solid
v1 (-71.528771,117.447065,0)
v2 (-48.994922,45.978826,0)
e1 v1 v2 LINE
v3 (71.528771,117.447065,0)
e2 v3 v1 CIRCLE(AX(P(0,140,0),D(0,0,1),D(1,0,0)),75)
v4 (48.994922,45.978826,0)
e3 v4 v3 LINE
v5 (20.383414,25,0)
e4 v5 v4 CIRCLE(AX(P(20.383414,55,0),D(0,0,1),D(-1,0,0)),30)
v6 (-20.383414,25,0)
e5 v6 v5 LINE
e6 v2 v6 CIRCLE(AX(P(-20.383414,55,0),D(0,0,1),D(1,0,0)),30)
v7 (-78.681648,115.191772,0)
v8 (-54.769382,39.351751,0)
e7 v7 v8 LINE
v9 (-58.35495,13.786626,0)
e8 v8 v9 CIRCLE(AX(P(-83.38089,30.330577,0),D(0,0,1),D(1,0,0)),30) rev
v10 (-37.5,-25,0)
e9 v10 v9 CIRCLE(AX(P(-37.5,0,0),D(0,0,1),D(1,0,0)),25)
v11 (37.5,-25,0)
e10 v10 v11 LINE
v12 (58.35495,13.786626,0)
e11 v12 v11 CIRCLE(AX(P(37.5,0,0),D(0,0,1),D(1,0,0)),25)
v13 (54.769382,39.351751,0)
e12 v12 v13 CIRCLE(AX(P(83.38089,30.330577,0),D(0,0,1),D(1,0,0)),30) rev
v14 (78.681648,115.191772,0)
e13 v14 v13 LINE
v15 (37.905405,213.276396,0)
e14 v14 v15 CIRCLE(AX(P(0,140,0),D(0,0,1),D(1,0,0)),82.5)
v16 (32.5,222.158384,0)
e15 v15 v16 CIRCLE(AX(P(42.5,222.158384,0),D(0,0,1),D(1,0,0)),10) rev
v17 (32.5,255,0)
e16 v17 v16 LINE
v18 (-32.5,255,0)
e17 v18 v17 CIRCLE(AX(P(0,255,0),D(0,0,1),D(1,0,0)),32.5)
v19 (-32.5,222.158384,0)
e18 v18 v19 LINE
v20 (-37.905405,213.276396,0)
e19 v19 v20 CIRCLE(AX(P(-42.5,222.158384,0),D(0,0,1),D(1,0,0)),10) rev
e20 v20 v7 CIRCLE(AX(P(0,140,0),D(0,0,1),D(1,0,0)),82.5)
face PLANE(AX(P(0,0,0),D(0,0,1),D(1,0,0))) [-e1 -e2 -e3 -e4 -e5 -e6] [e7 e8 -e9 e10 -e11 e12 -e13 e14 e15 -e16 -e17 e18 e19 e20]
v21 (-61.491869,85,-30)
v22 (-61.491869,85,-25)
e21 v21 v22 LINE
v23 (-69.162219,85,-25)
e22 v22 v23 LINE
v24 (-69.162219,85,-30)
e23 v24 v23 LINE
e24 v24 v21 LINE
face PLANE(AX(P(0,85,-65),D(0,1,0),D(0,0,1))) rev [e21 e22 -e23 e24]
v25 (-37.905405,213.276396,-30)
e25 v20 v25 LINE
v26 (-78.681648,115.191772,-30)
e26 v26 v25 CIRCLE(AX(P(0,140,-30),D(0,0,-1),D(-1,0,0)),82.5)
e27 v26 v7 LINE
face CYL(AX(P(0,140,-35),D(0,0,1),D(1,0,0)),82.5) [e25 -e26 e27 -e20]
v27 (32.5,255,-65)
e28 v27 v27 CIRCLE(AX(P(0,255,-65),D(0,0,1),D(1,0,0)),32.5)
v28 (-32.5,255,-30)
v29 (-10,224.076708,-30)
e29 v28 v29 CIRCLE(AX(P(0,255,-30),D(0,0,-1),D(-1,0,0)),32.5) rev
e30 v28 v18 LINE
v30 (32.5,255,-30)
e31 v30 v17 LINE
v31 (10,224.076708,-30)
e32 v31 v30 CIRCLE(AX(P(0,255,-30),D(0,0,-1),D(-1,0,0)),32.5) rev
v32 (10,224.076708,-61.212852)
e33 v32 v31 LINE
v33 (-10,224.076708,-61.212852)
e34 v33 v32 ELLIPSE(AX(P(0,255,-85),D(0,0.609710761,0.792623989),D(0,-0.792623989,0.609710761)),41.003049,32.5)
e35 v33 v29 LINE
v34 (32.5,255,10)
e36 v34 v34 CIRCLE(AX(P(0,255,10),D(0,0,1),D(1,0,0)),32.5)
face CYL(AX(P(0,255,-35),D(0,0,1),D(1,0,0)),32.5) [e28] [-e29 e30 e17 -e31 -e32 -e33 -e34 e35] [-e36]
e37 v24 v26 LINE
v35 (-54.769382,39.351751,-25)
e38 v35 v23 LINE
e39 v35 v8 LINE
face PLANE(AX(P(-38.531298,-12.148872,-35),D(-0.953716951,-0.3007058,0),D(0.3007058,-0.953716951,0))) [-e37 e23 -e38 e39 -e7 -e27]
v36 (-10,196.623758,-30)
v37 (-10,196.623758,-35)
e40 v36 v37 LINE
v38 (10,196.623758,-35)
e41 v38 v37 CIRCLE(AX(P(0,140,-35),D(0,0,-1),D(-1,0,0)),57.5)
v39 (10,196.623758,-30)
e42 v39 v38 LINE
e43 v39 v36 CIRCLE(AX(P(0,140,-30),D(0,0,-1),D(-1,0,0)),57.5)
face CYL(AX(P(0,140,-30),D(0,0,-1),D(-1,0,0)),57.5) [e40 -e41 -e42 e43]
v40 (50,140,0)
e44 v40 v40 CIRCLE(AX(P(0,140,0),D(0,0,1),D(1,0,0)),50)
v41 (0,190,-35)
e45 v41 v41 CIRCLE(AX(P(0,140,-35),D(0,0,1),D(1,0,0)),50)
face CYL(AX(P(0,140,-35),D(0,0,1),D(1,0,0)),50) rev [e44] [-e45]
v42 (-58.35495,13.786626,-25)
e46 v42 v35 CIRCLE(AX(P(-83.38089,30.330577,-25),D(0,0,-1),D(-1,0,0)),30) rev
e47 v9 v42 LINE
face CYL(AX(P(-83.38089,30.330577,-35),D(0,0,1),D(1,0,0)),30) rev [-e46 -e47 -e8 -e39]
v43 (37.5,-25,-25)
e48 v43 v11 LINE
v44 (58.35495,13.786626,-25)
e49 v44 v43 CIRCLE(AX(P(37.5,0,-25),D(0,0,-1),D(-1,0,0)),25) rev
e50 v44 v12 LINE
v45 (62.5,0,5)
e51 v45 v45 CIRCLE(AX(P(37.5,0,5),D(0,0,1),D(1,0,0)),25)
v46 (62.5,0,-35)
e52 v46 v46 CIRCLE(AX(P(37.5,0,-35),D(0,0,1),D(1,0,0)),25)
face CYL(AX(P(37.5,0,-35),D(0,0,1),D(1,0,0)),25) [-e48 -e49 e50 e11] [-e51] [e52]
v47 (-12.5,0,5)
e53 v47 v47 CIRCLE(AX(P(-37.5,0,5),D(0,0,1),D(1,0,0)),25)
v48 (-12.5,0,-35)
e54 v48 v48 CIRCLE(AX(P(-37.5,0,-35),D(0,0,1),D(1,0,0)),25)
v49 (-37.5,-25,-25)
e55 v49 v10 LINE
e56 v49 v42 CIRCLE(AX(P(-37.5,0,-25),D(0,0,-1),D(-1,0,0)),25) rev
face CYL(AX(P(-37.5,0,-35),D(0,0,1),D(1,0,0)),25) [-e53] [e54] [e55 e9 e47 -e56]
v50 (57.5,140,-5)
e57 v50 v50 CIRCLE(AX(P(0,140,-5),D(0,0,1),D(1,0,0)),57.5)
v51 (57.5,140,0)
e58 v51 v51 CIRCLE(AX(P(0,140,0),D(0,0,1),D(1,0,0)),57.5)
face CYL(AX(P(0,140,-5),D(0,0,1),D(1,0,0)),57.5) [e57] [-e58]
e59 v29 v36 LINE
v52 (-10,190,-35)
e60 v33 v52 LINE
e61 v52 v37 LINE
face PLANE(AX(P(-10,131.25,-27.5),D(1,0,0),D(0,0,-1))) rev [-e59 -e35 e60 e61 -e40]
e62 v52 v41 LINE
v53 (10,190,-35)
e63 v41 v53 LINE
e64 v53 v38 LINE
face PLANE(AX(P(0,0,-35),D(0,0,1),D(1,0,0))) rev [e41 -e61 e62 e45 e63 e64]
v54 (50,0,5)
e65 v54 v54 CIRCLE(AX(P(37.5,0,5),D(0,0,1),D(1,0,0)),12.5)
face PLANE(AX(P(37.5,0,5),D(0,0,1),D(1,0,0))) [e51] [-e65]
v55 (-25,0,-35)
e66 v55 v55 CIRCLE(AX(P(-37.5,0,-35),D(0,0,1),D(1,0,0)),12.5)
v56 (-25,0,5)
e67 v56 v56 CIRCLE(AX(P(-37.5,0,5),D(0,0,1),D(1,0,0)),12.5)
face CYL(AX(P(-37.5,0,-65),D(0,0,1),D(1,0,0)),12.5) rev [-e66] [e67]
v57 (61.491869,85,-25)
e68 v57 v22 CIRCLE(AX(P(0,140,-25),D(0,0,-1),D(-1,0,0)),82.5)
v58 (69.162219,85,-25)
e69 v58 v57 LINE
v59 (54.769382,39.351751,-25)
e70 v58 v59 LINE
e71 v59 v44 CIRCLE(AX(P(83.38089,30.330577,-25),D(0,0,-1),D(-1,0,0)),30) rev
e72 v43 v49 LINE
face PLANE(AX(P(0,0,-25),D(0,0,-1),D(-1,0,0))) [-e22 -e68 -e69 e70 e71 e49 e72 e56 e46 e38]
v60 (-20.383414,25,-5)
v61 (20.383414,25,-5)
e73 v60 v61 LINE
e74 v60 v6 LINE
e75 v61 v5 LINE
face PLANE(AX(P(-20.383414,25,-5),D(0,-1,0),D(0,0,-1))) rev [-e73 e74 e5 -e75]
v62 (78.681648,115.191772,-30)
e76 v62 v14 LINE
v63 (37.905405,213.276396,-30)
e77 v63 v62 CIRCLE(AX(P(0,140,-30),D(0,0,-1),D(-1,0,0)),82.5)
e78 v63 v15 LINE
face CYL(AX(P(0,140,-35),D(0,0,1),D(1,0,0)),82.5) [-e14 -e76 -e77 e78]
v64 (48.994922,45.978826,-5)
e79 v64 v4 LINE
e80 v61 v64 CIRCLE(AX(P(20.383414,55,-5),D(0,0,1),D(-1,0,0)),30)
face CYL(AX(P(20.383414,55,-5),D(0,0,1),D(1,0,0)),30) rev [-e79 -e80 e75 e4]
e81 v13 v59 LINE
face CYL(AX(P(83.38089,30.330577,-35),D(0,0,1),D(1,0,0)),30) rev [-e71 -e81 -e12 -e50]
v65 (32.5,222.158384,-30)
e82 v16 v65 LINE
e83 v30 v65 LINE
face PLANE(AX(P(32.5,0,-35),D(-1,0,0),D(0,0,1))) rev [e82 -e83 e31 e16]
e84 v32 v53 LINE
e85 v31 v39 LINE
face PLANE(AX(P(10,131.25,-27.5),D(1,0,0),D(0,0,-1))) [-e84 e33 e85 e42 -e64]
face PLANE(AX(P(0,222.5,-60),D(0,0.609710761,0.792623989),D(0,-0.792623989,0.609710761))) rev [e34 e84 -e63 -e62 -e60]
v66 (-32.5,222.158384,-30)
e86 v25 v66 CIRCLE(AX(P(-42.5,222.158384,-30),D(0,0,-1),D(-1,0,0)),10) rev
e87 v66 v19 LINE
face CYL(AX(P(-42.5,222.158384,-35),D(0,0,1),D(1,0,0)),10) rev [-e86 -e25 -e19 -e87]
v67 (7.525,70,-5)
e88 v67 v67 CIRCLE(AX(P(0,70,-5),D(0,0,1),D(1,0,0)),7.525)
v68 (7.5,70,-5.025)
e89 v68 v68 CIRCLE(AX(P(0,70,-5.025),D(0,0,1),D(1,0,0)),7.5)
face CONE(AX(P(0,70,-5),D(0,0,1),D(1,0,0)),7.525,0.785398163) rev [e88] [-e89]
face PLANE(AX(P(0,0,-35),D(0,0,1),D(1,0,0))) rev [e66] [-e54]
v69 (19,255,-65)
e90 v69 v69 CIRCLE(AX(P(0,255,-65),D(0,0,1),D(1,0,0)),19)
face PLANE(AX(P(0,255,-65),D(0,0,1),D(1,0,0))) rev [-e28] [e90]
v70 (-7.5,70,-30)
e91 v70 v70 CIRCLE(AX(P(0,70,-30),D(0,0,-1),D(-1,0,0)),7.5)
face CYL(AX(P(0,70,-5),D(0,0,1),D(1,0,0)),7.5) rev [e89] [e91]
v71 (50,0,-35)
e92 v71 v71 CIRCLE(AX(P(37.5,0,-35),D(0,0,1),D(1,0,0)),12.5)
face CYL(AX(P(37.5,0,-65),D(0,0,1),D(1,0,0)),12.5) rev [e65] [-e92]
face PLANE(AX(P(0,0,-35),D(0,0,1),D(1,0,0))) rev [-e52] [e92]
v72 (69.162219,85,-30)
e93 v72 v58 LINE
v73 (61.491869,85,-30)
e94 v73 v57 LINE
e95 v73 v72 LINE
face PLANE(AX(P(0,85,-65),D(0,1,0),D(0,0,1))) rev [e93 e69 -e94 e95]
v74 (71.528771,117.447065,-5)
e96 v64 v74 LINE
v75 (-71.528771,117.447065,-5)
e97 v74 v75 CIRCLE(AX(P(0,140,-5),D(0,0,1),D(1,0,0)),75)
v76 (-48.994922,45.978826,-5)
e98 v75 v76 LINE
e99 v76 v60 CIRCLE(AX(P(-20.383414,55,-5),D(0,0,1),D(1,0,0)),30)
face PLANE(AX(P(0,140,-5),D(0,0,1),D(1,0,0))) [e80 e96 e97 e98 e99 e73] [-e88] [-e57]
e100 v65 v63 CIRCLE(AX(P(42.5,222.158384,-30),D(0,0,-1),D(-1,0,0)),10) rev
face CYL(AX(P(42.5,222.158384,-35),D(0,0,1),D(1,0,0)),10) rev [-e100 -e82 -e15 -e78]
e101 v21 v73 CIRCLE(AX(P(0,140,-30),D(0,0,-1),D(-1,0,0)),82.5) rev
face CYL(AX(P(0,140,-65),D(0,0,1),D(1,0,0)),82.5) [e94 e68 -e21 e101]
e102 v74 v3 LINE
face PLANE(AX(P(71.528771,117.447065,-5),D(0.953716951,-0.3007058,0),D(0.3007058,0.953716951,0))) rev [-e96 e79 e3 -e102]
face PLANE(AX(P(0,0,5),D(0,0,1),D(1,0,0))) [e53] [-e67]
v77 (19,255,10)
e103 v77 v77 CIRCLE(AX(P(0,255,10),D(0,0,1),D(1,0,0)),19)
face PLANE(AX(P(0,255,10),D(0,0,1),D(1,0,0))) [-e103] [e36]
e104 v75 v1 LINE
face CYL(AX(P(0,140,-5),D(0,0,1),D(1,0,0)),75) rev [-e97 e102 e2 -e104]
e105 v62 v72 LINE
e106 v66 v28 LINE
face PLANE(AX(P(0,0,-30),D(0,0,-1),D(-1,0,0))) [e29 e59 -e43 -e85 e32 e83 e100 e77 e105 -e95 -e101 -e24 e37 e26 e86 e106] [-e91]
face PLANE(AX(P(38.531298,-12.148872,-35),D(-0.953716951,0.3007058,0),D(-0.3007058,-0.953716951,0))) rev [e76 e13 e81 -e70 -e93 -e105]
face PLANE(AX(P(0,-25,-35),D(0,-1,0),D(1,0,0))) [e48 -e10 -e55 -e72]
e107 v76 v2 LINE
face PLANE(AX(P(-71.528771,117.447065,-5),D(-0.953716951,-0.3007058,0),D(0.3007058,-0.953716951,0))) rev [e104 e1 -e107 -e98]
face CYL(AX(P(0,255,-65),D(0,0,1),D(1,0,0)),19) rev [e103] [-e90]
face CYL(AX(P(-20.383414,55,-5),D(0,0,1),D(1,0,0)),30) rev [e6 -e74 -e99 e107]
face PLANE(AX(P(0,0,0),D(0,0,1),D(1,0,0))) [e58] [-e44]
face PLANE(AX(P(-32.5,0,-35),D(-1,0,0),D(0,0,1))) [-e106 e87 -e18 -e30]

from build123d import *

# Parameters (mm, degrees)
SKETCH1_R               = 50
BOSS_EXTRUDE1_DEPTH     = 35
BOSS_EXTRUDE2_START     = 5
SKETCH1_4_R             = 25
SKETCH1_4_R_2           = 12.5
BOSS_EXTRUDE2_DEPTH     = 40
BOSS_EXTRUDE3_START     = 10
SKETCH1_5_R             = 32.5
BOSS_EXTRUDE3_DEPTH     = 75
SKETCH2_R               = 57.5
CUT_EXTRUDE1_DEPTH      = 5
FILLET1_R               = 10
CUT_EXTRUDE2_START      = -5
CUT_EXTRUDE2_OUTLINE_R  = 57.5
CUT_EXTRUDE2_DEPTH      = 5
CUT_EXTRUDE2_START_2    = -35
CUT_EXTRUDE2_2_DEPTH    = 30
CUT_EXTRUDE3_DEPTH      = 302.76563754
CUT_EXTRUDE3_DEPTH_BACK = 5
RIB1_REACH              = 308.084
SKETCH5_WALL_W          = 655.171326186
SKETCH5_WALL_H          = 20
CUT_EXTRUDE4_DEPTH      = 307.084138759
CUT_EXTRUDE4_DEPTH_BACK = 307.084138759
SKETCH1_6_R             = 12.5
SKETCH1_6_R_2           = 19


# Read off the part's stored shape, not the designer's step: Cut-Extrude2, Ø15.0 (15) Diameter Hole1
with BuildPart() as part:
    # Sketch1 → Boss-Extrude1 (new body)
    with BuildSketch(Plane.XY):
        with BuildLine():
            ThreePointArc((-32.5, 215.828754441), (-74.981933284, 174.408715189), (-78.681648437, 115.191771541))
            Line((-78.681648437, 115.191771541), (-49.309407385, 22.034924488))
            ThreePointArc((-49.309407385, 22.034924488), (-61.74740308, -6.087975353), (-37.5, -25))
            Line((-37.5, -25), (37.5, -25))
            ThreePointArc((37.5, -25), (61.74740308, -6.087975353), (49.309407385, 22.034924488))
            Line((49.309407385, 22.034924488), (78.681648437, 115.191771541))
            ThreePointArc((78.681648437, 115.191771541), (74.981933284, 174.408715189), (32.5, 215.828754441))
            Line((32.5, 215.828754441), (32.5, 255))
            ThreePointArc((32.5, 255), (0, 287.5), (-32.5, 255))
            Line((-32.5, 255), (-32.5, 215.828754441))
        make_face()
        with Locations((0, 140)):
            Circle(SKETCH1_R, mode=Mode.SUBTRACT)
    extrude(amount=-BOSS_EXTRUDE1_DEPTH)

    # Sketch1<4> → Boss-Extrude2 (add)
    # profile 1 of 3: a face of its own
    with BuildSketch(Plane.XY.offset(BOSS_EXTRUDE2_START)):
        with Locations((-37.5, 0)):
            Circle(SKETCH1_4_R)
        with Locations((-37.5, 0)):
            Circle(SKETCH1_4_R_2, mode=Mode.SUBTRACT)
    # profile 2 of 3: a face of its own
    with BuildSketch(Plane.XY.offset(BOSS_EXTRUDE2_START)):
        with Locations((-37.5, 0)):
            Circle(SKETCH1_4_R_2)
    # profile 3 of 3: a face of its own
    with BuildSketch(Plane.XY.offset(BOSS_EXTRUDE2_START)):
        with Locations((37.5, 0)):
            Circle(SKETCH1_4_R)
    extrude(amount=-BOSS_EXTRUDE2_DEPTH)

    # Sketch1<5> → Boss-Extrude3 (add)
    with BuildSketch(Plane.XY.offset(BOSS_EXTRUDE3_START)):
        with Locations((0, 255)):
            Circle(SKETCH1_5_R)
    extrude(amount=-BOSS_EXTRUDE3_DEPTH)

    # Sketch2 → Cut-Extrude1 (cut)
    with BuildSketch(Plane.XY):
        with BuildLine():
            Line((-71.528771306, 117.447065037), (-48.994922099, 45.978826015))
            ThreePointArc((-48.994922099, 45.978826015), (-38.122703028, 30.806661872), (-20.383413577, 25))
            Line((-20.383413577, 25), (20.383413577, 25))
            ThreePointArc((20.383413577, 25), (38.122703028, 30.806661872), (48.994922099, 45.978826015))
            Line((48.994922099, 45.978826015), (71.528771306, 117.447065037))
            ThreePointArc((71.528771306, 117.447065037), (0, 215), (-71.528771306, 117.447065037))
        make_face()
        with Locations((0, 140)):
            Circle(SKETCH2_R, mode=Mode.SUBTRACT)
    extrude(amount=-CUT_EXTRUDE1_DEPTH, mode=Mode.SUBTRACT)

    # Fillet1
    fillet1_edges = [part.edges().sort_by_distance(p)[0] for p in [
        (-32.5, 215.828754441, -17.5),
        (32.5, 215.828754441, -17.5),
    ]]
    fillet(fillet1_edges, radius=FILLET1_R)

    # Cut-Extrude2 outline → Cut-Extrude2 (cut)
    with BuildSketch(Plane(origin=(0, 0, -35), x_dir=(-1, 0, 0), z_dir=(0, 0, -1)).offset(CUT_EXTRUDE2_START)):
        with BuildLine():
            Line((-78.681648437, 115.191771541), (-49.309407385, 22.034924488))
            ThreePointArc((-49.309407385, 22.034924488), (-13.25259692, 6.087975353), (-37.5, -25))
            Line((-37.5, -25), (37.5, -25))
            ThreePointArc((37.5, -25), (13.25259692, 6.087975353), (49.309407385, 22.034924488))
            Line((49.309407385, 22.034924488), (78.681648437, 115.191771541))
            ThreePointArc((78.681648437, 115.191771541), (76.179286423, 171.669643512), (37.905405405, 213.276396207))
            ThreePointArc((37.905405405, 213.276396207), (33.957578038, 216.959631177), (32.5, 222.158383626))
            Line((32.5, 222.158383626), (32.5, 255))
            ThreePointArc((32.5, 255), (0, 222.5), (-32.5, 255))
            Line((-32.5, 255), (-32.5, 222.158383626))
            ThreePointArc((-32.5, 222.158383626), (-33.957578038, 216.959631177), (-37.905405405, 213.276396207))
            ThreePointArc((-37.905405405, 213.276396207), (-76.179286423, 171.669643512), (-78.681648437, 115.191771541))
        make_face()
        with Locations((0, 140)):
            Circle(CUT_EXTRUDE2_OUTLINE_R, mode=Mode.SUBTRACT)
    extrude(amount=CUT_EXTRUDE2_DEPTH, mode=Mode.SUBTRACT)

    # Cut-Extrude2 2 outline → Cut-Extrude2 2 (add)
    with BuildSketch(Plane(origin=(0, 0, -35), x_dir=(-1, 0, 0), z_dir=(0, 0, -1)).offset(CUT_EXTRUDE2_START_2)):
        with BuildLine():
            Line((-49.309407385, 22.034924488), (-54.769381812, 39.351751001))
            ThreePointArc((-54.769381812, 39.351751001), (-53.67166818, 26.163789409), (-58.354950152, 13.786625916))
            ThreePointArc((-58.354950152, 13.786625916), (-54.34484107, 18.472989182), (-49.309407385, 22.034924488))
        make_face()
        with BuildLine():
            Line((54.769381812, 39.351751001), (49.309407385, 22.034924488))
            ThreePointArc((49.309407385, 22.034924488), (54.34484107, 18.472989182), (58.354950152, 13.786625916))
            ThreePointArc((58.354950152, 13.786625916), (53.67166818, 26.163789409), (54.769381812, 39.351751001))
        make_face()
    extrude(amount=CUT_EXTRUDE2_2_DEPTH)

    # Sketch4 → Cut-Extrude3 (cut, two sides: drawn at the far end of the back side and taken through both)
    with BuildSketch(Plane(origin=(0, 0, -30), x_dir=(-1, 0, 0), z_dir=(0, 0, -1)).offset(-CUT_EXTRUDE3_DEPTH_BACK)):
        with BuildLine():
            Line((-61.491869381, 85), (-69.162219436, 85))
            Line((-69.162219436, 85), (-54.769381812, 39.351751001))
            ThreePointArc((-54.769381812, 39.351751001), (-53.67166818, 26.163789409), (-58.354950152, 13.786625916))
            ThreePointArc((-58.354950152, 13.786625916), (-15.481080318, 11.839221936), (-37.5, -25))
            Line((-37.5, -25), (37.5, -25))
            ThreePointArc((37.5, -25), (15.481080318, 11.839221936), (58.354950152, 13.786625916))
            ThreePointArc((58.354950152, 13.786625916), (53.67166818, 26.163789409), (54.769381812, 39.351751001))
            Line((54.769381812, 39.351751001), (69.162219436, 85))
            Line((69.162219436, 85), (61.491869381, 85))
            ThreePointArc((61.491869381, 85), (0, 57.5), (-61.491869381, 85))
        make_face()
    extrude(amount=CUT_EXTRUDE3_DEPTH + CUT_EXTRUDE3_DEPTH_BACK, mode=Mode.SUBTRACT)

    # Sketch5 wall → Rib1 (add, up to next)
    with BuildSketch(Plane(origin=(0, 206.25, -47.5), x_dir=(0, -0.792623989105, 0.60971076085), z_dir=(0, -0.60971076085, -0.792623989105)), mode=Mode.PRIVATE) as rib1_sk1:
        Rectangle(SKETCH5_WALL_W, SKETCH5_WALL_H)
    rib1_tool1 = extrude(rib1_sk1.sketch, amount=-RIB1_REACH, mode=Mode.PRIVATE) - part.part
    add(rib1_tool1.solids().sort_by_distance((0, 206.25, -47.5))[0])

    # Sketch1<6> → Cut-Extrude4 (cut, two sides: drawn at the far end of the back side and taken through both)
    with BuildSketch(Plane.XY.offset(-CUT_EXTRUDE4_DEPTH_BACK)):
        with Locations((-37.5, 0)):
            Circle(SKETCH1_6_R)
        with Locations((37.5, 0)):
            Circle(SKETCH1_6_R)
        with Locations((0, 255)):
            Circle(SKETCH1_6_R_2)
    extrude(amount=CUT_EXTRUDE4_DEPTH + CUT_EXTRUDE4_DEPTH_BACK, mode=Mode.SUBTRACT)

    # Ø15.0 (15) Diameter Hole1 outline → Ø15.0 (15) Diameter Hole1 (revolve, cut)
    with BuildSketch(Plane.XZ.offset(-70)):
        Polygon((0, -30), (7.5, -30), (7.5, -5.025), (7.525, -5), (0, -5), align=None)
    revolve(axis=Axis((0, 70, 0), (0, 0, 1)), mode=Mode.SUBTRACT)


solid = part.part
